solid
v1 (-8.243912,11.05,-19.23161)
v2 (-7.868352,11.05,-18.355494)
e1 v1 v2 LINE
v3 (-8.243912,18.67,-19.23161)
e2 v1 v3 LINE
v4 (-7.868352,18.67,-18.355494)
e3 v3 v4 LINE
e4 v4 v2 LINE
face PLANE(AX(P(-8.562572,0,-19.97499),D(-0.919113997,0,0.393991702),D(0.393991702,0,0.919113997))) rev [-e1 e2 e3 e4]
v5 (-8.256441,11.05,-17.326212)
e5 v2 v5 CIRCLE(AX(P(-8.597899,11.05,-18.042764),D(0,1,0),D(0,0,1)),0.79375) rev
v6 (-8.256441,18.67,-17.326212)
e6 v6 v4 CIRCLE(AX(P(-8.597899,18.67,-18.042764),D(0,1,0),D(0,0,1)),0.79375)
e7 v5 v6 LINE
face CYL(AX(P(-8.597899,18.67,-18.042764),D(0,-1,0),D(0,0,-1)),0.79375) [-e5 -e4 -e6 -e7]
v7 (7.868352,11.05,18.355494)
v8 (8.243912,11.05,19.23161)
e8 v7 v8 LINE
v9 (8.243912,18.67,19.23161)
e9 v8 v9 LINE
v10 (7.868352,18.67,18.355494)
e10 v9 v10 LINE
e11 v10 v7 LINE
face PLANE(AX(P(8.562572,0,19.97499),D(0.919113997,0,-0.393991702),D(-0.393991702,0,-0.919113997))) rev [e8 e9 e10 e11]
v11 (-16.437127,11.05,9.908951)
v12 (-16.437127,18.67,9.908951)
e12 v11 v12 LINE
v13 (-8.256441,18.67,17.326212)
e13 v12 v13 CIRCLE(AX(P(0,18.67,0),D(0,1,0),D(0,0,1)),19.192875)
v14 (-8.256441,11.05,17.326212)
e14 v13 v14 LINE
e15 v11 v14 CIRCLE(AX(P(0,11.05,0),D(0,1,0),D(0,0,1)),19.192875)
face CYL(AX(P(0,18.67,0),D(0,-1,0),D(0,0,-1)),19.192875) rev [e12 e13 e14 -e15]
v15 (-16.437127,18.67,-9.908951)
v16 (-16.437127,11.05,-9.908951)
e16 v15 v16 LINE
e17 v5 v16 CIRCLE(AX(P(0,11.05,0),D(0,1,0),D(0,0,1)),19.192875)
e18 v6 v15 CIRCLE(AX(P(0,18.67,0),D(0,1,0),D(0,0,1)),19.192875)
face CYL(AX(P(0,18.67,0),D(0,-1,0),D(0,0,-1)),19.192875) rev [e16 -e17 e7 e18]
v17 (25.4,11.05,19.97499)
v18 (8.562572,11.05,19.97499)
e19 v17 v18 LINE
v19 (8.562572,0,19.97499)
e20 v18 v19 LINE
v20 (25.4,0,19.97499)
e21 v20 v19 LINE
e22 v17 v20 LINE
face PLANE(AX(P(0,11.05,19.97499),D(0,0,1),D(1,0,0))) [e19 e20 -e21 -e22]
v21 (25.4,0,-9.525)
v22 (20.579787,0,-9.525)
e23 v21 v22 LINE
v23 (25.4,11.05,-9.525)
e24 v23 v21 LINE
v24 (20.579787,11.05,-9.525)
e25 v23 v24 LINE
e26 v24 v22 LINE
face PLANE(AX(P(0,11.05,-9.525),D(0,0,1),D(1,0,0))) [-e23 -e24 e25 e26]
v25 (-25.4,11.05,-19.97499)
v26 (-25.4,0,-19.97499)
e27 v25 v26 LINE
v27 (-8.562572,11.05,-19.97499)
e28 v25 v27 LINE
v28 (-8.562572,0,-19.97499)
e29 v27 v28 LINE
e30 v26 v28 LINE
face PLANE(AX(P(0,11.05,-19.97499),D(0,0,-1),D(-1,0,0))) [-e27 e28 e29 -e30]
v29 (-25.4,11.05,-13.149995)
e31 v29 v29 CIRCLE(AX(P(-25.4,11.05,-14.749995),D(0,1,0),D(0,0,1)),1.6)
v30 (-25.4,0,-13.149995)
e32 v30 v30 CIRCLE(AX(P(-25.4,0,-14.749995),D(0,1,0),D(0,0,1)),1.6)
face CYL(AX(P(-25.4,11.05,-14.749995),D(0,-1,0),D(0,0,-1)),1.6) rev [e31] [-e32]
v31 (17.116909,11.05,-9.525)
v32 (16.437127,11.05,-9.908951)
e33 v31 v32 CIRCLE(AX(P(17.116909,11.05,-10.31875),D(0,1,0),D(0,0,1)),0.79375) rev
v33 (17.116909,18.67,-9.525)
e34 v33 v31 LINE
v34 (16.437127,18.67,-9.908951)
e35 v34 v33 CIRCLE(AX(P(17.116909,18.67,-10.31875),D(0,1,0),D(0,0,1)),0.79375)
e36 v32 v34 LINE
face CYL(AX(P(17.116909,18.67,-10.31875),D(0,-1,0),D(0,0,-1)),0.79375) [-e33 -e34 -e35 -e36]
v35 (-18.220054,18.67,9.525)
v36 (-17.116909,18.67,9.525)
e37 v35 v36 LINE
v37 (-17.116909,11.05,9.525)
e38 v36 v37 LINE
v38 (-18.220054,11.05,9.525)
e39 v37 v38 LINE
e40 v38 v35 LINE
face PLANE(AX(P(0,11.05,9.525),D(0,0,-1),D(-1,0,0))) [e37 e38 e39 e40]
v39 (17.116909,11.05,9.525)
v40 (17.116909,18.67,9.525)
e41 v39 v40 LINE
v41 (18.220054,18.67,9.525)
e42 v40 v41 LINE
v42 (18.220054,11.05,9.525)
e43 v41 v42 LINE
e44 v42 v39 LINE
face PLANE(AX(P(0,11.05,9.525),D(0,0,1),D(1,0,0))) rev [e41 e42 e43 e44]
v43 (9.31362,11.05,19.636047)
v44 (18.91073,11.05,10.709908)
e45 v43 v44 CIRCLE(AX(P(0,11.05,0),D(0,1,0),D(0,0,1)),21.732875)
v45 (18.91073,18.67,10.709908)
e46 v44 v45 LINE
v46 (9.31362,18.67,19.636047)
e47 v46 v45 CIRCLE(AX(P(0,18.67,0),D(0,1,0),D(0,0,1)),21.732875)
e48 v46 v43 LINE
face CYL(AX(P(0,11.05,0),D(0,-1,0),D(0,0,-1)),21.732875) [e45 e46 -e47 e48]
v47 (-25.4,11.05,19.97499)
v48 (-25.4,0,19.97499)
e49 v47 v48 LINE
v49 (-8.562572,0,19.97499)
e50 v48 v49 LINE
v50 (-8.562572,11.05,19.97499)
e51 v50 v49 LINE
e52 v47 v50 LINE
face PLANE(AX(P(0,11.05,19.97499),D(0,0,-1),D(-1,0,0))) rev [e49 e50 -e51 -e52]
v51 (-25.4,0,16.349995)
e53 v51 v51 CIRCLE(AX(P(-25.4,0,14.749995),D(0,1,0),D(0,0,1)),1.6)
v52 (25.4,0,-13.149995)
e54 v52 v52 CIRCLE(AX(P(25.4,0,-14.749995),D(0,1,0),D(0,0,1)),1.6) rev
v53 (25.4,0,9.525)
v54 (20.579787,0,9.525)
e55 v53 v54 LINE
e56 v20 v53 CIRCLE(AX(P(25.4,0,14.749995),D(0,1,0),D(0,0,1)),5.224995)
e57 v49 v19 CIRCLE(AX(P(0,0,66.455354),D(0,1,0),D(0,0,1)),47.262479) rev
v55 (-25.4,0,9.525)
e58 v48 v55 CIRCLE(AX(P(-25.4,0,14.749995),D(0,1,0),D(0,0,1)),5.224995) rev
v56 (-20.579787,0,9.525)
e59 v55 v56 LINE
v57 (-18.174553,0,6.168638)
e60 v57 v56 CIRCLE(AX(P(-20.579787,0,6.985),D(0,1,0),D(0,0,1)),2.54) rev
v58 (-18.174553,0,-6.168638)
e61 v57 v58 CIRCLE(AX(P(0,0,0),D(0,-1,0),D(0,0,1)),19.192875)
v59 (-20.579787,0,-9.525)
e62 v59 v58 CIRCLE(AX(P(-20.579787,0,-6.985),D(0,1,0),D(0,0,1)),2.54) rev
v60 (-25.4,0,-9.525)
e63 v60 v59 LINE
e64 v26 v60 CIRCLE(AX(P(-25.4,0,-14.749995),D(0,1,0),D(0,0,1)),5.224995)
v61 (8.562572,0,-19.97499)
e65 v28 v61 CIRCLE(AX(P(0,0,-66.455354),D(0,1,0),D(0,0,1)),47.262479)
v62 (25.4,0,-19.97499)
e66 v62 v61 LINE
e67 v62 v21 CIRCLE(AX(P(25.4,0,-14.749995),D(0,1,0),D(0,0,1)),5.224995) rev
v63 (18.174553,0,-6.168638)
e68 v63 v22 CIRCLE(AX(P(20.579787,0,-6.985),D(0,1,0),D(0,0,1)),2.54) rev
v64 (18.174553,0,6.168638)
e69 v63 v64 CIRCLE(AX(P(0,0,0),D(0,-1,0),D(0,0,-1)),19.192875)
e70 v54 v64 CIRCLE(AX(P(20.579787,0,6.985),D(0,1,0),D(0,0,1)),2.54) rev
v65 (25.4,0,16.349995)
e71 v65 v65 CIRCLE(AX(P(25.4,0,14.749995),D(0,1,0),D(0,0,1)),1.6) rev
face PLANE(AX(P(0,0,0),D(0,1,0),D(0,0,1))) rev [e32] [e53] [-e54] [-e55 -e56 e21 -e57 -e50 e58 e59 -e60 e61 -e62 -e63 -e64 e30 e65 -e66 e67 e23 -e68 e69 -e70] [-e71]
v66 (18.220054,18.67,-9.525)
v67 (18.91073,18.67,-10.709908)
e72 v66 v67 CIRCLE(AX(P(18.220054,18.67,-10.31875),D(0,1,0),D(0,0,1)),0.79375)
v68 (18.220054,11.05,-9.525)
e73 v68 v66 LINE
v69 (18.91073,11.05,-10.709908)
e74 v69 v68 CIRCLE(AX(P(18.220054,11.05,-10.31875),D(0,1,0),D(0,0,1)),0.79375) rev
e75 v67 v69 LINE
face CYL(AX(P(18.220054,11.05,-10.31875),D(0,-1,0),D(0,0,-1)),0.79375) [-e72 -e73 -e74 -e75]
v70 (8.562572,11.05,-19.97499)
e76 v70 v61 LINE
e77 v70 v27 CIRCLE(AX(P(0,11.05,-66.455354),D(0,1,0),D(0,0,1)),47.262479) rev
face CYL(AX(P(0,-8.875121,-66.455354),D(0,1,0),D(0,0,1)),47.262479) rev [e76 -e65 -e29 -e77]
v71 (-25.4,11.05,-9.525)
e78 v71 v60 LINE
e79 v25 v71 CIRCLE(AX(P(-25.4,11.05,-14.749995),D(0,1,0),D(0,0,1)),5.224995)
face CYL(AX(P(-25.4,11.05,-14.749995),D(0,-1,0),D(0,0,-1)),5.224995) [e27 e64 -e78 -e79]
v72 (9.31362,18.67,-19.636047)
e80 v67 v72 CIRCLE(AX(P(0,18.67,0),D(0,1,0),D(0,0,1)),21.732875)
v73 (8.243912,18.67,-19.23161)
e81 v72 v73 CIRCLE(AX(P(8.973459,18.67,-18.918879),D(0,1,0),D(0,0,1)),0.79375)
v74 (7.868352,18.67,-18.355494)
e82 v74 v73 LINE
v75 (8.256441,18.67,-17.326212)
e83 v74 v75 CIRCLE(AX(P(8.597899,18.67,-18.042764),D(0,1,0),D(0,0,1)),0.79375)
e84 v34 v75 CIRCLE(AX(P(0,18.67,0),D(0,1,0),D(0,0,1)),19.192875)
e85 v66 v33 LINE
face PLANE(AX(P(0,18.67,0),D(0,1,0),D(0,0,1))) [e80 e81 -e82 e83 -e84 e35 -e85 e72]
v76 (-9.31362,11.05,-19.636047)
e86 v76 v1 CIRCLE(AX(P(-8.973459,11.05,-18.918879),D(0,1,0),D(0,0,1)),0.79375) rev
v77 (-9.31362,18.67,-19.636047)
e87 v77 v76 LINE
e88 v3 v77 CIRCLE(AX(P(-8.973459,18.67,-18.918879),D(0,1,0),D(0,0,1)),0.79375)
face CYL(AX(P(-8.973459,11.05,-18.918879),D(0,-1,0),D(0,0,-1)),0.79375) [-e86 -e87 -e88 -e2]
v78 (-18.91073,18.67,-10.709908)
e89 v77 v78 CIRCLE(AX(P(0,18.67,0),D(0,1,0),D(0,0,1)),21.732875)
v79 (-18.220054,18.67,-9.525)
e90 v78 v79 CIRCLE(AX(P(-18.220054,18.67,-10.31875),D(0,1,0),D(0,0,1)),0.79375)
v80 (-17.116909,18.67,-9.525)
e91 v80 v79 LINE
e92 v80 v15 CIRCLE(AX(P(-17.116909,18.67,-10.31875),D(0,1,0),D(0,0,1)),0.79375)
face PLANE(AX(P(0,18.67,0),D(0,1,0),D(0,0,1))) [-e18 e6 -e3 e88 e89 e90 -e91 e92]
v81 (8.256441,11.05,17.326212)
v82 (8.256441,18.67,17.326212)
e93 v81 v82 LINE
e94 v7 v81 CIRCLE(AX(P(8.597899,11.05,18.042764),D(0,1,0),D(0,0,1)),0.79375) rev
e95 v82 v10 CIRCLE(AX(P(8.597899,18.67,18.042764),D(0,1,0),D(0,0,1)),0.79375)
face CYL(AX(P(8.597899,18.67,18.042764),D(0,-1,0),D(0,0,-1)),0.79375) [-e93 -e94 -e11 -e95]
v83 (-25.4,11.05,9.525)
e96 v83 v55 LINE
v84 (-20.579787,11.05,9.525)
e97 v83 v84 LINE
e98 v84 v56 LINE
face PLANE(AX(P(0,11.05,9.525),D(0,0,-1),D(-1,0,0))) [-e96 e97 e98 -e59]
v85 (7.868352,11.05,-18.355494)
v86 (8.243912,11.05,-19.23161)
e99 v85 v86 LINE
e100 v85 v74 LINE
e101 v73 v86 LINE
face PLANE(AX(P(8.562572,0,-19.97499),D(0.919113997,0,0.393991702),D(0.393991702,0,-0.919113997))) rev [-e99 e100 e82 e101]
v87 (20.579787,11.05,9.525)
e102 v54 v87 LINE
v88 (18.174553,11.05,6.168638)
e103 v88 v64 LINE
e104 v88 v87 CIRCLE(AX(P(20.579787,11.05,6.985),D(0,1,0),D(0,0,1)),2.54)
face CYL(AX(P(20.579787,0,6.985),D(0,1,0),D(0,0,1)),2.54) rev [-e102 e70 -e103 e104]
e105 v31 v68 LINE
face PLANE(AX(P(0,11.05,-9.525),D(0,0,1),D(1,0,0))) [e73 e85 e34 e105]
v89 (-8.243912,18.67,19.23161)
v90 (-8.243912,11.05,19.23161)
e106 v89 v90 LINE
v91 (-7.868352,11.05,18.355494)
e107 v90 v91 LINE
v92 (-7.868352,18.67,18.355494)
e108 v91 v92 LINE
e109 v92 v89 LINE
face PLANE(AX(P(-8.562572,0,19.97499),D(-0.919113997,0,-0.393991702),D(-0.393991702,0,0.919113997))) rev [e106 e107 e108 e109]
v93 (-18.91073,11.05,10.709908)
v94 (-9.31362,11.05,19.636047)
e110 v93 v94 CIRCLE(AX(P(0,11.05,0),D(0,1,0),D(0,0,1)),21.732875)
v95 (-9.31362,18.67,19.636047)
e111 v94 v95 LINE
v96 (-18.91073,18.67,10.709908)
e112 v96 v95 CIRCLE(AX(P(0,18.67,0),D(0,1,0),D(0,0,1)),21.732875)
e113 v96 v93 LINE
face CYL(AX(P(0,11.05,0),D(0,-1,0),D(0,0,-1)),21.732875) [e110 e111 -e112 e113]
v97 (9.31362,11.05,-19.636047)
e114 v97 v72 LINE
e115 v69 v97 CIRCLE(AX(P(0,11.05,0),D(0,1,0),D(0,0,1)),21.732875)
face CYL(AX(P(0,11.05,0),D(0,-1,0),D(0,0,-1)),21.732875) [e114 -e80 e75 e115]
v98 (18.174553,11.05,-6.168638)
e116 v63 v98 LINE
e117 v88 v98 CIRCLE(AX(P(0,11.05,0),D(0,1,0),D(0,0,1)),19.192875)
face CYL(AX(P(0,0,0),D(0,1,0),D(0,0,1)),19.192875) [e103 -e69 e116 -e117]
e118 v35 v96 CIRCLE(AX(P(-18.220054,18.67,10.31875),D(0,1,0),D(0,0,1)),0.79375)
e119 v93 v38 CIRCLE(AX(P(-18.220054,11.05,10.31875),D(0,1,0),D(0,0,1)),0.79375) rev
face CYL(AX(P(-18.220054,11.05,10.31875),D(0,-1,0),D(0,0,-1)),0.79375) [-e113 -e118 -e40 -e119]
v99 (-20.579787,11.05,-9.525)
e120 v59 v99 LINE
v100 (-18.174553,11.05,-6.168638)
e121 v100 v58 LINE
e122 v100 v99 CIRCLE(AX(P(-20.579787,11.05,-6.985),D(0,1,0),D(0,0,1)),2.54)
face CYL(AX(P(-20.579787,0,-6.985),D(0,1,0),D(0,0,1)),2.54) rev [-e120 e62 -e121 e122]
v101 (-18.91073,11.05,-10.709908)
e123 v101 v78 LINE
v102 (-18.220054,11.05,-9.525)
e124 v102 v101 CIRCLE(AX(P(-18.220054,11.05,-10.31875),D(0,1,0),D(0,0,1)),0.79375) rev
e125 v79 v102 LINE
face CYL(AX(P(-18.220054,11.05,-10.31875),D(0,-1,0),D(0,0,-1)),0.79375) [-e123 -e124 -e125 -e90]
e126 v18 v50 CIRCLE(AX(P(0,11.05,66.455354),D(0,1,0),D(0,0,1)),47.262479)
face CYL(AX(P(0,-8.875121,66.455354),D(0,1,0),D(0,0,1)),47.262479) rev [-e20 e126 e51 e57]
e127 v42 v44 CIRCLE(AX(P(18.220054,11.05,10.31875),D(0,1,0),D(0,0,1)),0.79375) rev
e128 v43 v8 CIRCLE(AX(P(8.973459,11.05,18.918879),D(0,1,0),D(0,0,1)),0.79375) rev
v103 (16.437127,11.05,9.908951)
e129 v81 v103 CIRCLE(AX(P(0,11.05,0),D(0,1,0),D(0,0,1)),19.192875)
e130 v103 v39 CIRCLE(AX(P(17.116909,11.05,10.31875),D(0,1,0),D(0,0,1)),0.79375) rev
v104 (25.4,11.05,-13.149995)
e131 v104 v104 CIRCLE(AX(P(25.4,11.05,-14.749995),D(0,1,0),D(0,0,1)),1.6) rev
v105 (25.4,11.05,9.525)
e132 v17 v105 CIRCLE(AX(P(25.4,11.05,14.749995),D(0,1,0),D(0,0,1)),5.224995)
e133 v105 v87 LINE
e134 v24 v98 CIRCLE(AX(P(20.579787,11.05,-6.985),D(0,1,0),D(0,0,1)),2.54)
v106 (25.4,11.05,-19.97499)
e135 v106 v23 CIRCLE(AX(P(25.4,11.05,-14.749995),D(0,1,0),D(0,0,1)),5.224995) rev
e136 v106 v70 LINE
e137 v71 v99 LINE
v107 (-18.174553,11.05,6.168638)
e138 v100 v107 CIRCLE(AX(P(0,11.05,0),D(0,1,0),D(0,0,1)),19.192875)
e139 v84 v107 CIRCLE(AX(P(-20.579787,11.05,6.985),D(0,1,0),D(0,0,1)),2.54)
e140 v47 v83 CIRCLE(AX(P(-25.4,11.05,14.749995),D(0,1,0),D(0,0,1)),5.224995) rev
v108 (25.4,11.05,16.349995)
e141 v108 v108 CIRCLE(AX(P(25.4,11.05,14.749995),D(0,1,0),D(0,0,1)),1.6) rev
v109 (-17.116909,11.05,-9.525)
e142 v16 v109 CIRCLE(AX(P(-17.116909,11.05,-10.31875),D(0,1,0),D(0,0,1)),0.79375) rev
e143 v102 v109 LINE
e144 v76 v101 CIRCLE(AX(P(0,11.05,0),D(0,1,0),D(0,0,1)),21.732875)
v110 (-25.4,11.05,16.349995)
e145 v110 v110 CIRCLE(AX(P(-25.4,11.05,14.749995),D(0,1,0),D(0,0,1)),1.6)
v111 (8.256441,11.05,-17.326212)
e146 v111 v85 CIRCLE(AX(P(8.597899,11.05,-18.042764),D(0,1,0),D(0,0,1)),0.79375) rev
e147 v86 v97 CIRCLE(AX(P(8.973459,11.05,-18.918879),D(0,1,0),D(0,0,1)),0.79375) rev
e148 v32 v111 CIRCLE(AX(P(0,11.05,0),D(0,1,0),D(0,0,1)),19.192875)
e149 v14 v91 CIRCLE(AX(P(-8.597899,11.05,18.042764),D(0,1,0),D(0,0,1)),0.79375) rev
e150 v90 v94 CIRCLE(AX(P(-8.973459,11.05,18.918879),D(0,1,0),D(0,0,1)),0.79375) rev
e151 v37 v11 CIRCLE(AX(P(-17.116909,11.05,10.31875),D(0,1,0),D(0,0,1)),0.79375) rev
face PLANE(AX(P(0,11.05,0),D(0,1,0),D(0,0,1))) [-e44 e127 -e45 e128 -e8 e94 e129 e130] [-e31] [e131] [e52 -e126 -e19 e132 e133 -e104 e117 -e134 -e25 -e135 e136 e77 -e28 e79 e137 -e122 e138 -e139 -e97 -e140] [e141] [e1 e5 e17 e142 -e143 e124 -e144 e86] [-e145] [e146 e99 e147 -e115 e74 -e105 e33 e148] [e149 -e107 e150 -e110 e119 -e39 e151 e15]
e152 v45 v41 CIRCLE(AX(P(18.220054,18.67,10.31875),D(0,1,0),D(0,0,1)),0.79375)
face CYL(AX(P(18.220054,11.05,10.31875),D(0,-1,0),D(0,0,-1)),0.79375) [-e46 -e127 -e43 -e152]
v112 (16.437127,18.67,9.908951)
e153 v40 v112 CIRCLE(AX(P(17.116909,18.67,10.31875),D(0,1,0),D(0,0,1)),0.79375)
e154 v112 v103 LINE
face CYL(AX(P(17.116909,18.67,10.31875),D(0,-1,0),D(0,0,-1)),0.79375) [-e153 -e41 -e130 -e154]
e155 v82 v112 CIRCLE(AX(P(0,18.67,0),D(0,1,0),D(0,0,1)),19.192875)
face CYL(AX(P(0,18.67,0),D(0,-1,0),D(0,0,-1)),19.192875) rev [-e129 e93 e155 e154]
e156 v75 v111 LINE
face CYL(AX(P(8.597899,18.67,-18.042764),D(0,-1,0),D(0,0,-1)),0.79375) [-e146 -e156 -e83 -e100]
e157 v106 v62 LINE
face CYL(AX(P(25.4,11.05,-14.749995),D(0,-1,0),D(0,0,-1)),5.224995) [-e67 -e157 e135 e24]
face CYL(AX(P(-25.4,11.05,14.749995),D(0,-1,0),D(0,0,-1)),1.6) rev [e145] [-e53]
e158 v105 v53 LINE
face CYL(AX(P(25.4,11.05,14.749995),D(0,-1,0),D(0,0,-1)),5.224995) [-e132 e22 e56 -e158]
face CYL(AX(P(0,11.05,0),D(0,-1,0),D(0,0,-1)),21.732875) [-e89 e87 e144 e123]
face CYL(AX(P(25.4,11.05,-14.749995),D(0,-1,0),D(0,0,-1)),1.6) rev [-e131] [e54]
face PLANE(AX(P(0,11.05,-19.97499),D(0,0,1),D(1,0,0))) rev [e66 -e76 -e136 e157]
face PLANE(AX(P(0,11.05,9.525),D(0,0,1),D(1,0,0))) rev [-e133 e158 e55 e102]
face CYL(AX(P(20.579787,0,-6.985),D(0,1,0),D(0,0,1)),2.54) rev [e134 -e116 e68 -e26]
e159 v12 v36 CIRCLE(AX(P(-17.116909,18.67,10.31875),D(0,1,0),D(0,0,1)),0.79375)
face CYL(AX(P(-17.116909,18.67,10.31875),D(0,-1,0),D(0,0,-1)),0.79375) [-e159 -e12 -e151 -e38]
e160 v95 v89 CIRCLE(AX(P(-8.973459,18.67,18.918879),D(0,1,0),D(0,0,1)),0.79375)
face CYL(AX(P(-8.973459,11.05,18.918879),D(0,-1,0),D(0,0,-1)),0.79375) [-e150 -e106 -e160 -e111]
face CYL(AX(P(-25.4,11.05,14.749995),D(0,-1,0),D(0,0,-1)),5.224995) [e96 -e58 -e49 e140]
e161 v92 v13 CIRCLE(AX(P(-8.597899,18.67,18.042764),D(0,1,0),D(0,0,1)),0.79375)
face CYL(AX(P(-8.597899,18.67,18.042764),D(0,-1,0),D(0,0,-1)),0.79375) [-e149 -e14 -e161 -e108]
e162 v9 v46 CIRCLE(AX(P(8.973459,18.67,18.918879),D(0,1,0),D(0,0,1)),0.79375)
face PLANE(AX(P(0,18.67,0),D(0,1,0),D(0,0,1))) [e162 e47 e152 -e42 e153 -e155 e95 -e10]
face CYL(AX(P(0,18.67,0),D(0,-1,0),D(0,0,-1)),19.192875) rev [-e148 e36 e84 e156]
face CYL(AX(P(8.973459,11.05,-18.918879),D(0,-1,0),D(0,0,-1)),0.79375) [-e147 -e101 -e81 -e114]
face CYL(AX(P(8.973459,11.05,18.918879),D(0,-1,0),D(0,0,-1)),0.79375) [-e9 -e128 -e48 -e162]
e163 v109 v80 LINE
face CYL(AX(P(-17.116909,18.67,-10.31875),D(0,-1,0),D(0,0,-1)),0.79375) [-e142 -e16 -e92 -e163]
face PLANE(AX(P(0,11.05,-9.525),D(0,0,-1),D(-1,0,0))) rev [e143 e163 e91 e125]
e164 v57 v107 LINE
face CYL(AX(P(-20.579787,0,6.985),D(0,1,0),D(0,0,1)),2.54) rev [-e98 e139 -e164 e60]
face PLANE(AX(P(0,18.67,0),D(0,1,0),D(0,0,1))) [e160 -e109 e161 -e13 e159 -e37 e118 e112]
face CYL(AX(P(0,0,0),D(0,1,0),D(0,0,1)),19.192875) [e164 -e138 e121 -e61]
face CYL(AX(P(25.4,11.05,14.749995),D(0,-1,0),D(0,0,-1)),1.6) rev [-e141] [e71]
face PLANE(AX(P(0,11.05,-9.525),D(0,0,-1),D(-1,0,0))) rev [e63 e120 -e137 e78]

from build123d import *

# Parameters (mm, degrees)
SKETCH1_R           = 1.6
SKETCH1_R_2         = 21.732875
SKETCH1_R_3         = 19.192875
BOSS_EXTRUDE1_DEPTH = 11.05
BOSS_EXTRUDE2_START = 11.05
SKETCH1_3_R         = 21.732875
SKETCH1_3_R_2       = 19.192875
BOSS_EXTRUDE2_DEPTH = 7.62
CUT_EXTRUDE1_DEPTH  = 42.937776077
FILLET2_R           = 0.79375
FILLET4_R           = 2.54
FILLET5_R           = 2.54
FILLET6_R           = 2.54
FILLET7_R           = 2.54
BOSS_EXTRUDE3_DEPTH = 11.05


with BuildPart() as part:
    # Sketch1 → Boss-Extrude1 (new body)
    # profile 1 of 6: a face of its own
    with BuildSketch(Plane(origin=(0, 0, 0), x_dir=(1, 0, 0), z_dir=(0, 1, 0))):
        with BuildLine():
            Line((-8.562572408, 19.9749896), (-25.4, 19.9749896))
            ThreePointArc((-25.4, 19.9749896), (-30.6249948, 14.7499948), (-25.4, 9.525))
            Line((-25.4, 9.525), (-19.534385856, 9.525))
            ThreePointArc((-19.534385856, 9.525), (-14.98867361, 15.737138215), (-8.562572408, 19.9749896))
        make_face()
        with Locations(Location((-25.4, 14.7499948, 0), (0, 0, 270))):
            Circle(SKETCH1_R, mode=Mode.SUBTRACT)
    # profile 2 of 6: a face of its own
    with BuildSketch(Plane(origin=(0, 0, 0), x_dir=(1, 0, 0), z_dir=(0, 1, 0))):
        Circle(SKETCH1_R_2)
        Circle(SKETCH1_R_3, mode=Mode.SUBTRACT)
    # profile 3 of 6: a face of its own
    with BuildSketch(Plane(origin=(0, 0, 0), x_dir=(1, 0, 0), z_dir=(0, 1, 0))):
        with BuildLine():
            Line((25.4, 19.9749896), (8.562572408, 19.9749896))
            ThreePointArc((8.562572408, 19.9749896), (14.98867361, 15.737138215), (19.534385856, 9.525))
            Line((19.534385856, 9.525), (25.4, 9.525))
            ThreePointArc((25.4, 9.525), (30.6249948, 14.7499948), (25.4, 19.9749896))
        make_face()
        with Locations(Location((25.4, 14.7499948, 0), (0, 0, 270))):
            Circle(SKETCH1_R, mode=Mode.SUBTRACT)
    # profile 4 of 6: a face of its own
    with BuildSketch(Plane(origin=(0, 0, 0), x_dir=(1, 0, 0), z_dir=(0, 1, 0))):
        with BuildLine():
            Line((25.4, -9.525), (19.534385856, -9.525))
            ThreePointArc((19.534385856, -9.525), (14.98867361, -15.737138215), (8.562572408, -19.9749896))
            Line((8.562572408, -19.9749896), (25.4, -19.9749896))
            ThreePointArc((25.4, -19.9749896), (30.6249948, -14.7499948), (25.4, -9.525))
        make_face()
        with Locations(Location((25.4, -14.7499948, 0), (0, 0, 270))):
            Circle(SKETCH1_R, mode=Mode.SUBTRACT)
    # profile 5 of 6: a face of its own
    with BuildSketch(Plane(origin=(0, 0, 0), x_dir=(1, 0, 0), z_dir=(0, 1, 0))):
        with BuildLine():
            ThreePointArc((-8.562572408, -19.9749896), (-14.98867361, -15.737138215), (-19.534385856, -9.525))
            Line((-19.534385856, -9.525), (-25.4, -9.525))
            ThreePointArc((-25.4, -9.525), (-30.6249948, -14.7499948), (-25.4, -19.9749896))
            Line((-25.4, -19.9749896), (-8.562572408, -19.9749896))
        make_face()
        with Locations(Location((-25.4, -14.7499948, 0), (0, 0, 270))):
            Circle(SKETCH1_R, mode=Mode.SUBTRACT)
    # profile 6 of 6: a face of its own
    with BuildSketch(Plane(origin=(0, 0, 0), x_dir=(1, 0, 0), z_dir=(0, 1, 0))):
        Circle(SKETCH1_R_3)
    extrude(amount=BOSS_EXTRUDE1_DEPTH)

    # Sketch1<3> → Boss-Extrude2 (add)
    with BuildSketch(Plane(origin=(0, 0, 0), x_dir=(1, 0, 0), z_dir=(0, 1, 0)).offset(BOSS_EXTRUDE2_START)):
        with Locations(Location((0, 0, 0), (0, 0, 113.203103919))):
            Circle(SKETCH1_3_R)
        with Locations(Location((0, 0, 0), (0, 0, 90))):
            Circle(SKETCH1_3_R_2, mode=Mode.SUBTRACT)
    extrude(amount=BOSS_EXTRUDE2_DEPTH)

    # Sketch2 → Cut-Extrude1 (cut, through all)
    with BuildSketch(Plane(origin=(0, 18.67, 0), x_dir=(1, 0, 0), z_dir=(0, 1, 0))):
        with BuildLine():
            Line((-19.534385856, 9.525), (-16.6625576, 9.525))
            ThreePointArc((-16.6625576, 9.525), (-19.192875, 0), (-16.6625576, -9.525))
            Line((-16.6625576, -9.525), (-19.534385856, -9.525))
            ThreePointArc((-19.534385856, -9.525), (-21.732875, 0), (-19.534385856, 9.525))
        make_face()
        with BuildLine():
            Line((19.534385856, 9.525), (16.6625576, 9.525))
            ThreePointArc((16.6625576, 9.525), (19.192875, 0), (16.6625576, -9.525))
            Line((16.6625576, -9.525), (19.534385856, -9.525))
            ThreePointArc((19.534385856, -9.525), (21.732875, 0), (19.534385856, 9.525))
        make_face()
        with BuildLine():
            Line((-8.562572408, 19.9749896), (-7.561833485, 17.640440049))
            ThreePointArc((-7.561833485, 17.640440049), (0, 19.192875), (7.561833485, 17.640440049))
            Line((7.561833485, 17.640440049), (8.562572408, 19.9749896))
            ThreePointArc((8.562572408, 19.9749896), (0, 21.732875), (-8.562572408, 19.9749896))
        make_face()
        with BuildLine():
            Line((-8.562572408, -19.9749896), (-7.561833485, -17.640440049))
            ThreePointArc((-7.561833485, -17.640440049), (0, -19.192875), (7.561833485, -17.640440049))
            Line((7.561833485, -17.640440049), (8.562572408, -19.9749896))
            ThreePointArc((8.562572408, -19.9749896), (0, -21.732875), (-8.562572408, -19.9749896))
        make_face()
    extrude(amount=-CUT_EXTRUDE1_DEPTH, mode=Mode.SUBTRACT)

    # Fillet2
    fillet2_edges = [part.edges().sort_by_distance(p)[0] for p in [
        (16.6625576, 14.86, 9.525),
        (19.534385856, 14.86, -9.525),
        (19.534385856, 14.86, 9.525),
        (16.6625576, 14.86, -9.525),
        (7.561833485, 14.86, -17.640440049),
        (-8.562572408, 14.86, -19.9749896),
        (8.562572408, 14.86, -19.9749896),
        (-7.561833485, 14.86, -17.640440049),
        (-16.6625576, 14.86, -9.525),
        (-19.534385856, 14.86, 9.525),
        (-19.534385856, 14.86, -9.525),
        (-16.6625576, 14.86, 9.525),
        (-7.561833485, 14.86, 17.640440049),
        (8.562572408, 14.86, 19.9749896),
        (-8.562572408, 14.86, 19.9749896),
        (7.561833485, 14.86, 17.640440049),
    ]]
    fillet(fillet2_edges, radius=FILLET2_R)

    # Fillet4
    # the kernel refuses this fillet: 2.54 mm, written as the material it adds along each edge
    with BuildSketch(Plane(origin=(16.6625576, 11.05, 9.525), x_dir=(1, 0, 0), z_dir=(0, -1, 0))) as fillet4_piece_1:
        with BuildLine():
            CenterArc((3.917229347, -2.54), FILLET4_R, 90, 108.747762366)
            ThreePointArc((1.511994934, -3.356362308), (0.836652457, -1.641847194), (0, 0))
            Line((0, 0), (3.917229347, 0))
        make_face()
    extrude(amount=11.05)

    # Fillet5
    # the kernel refuses this fillet: 2.54 mm, written as the material it adds along each edge
    with BuildSketch(Plane(origin=(16.6625576, 11.05, -9.525), x_dir=(0.41073329589504654, 0, 0.9117555372155368), z_dir=(0, -1, 0))) as fillet5_piece_1:
        with BuildLine():
            CenterArc((3.924795585, -2.528292976), FILLET5_R, 95.503145264, 108.747762366)
            Line((1.60893652, -3.571555547), (0, 0))
            ThreePointArc((0, 0), (1.840604291, -0.088461201), (3.681208582, 0))
        make_face()
    extrude(amount=11.05)

    # Fillet6
    # the kernel refuses this fillet: 2.54 mm, written as the material it adds along each edge
    with BuildSketch(Plane(origin=(-16.6625576, 11.05, -9.525), x_dir=(-1, 0, 0), z_dir=(0, -1, 0))) as fillet6_piece_1:
        with BuildLine():
            CenterArc((3.917229347, -2.54), FILLET6_R, 90, 108.747762366)
            ThreePointArc((1.511994934, -3.356362308), (0.836652457, -1.641847194), (0, 0))
            Line((0, 0), (3.917229347, 0))
        make_face()
    extrude(amount=11.05)

    # Fillet7
    # the kernel refuses this fillet: 2.54 mm, written as the material it adds along each edge
    with BuildSketch(Plane(origin=(-16.6625576, 11.05, 9.525), x_dir=(-0.41073329589504604, 0, -0.9117555372155371), z_dir=(0, -1, 0))) as fillet7_piece_1:
        with BuildLine():
            CenterArc((3.924795585, -2.528292976), FILLET7_R, 95.503145264, 108.747762366)
            Line((1.60893652, -3.571555547), (0, 0))
            ThreePointArc((0, 0), (1.840604291, -0.088461201), (3.681208582, 0))
        make_face()
    extrude(amount=11.05)

    # Sketch3 → Boss-Extrude3 (add)
    with BuildSketch(Plane(origin=(0, 11.05, 0), x_dir=(1, 0, 0), z_dir=(0, 1, 0))):
        with BuildLine():
            ThreePointArc((9.7e-08, 19.192875), (3.859772707, 18.800760767), (7.561833485, 17.640440049))
            Line((7.561833485, 17.640440049), (8.562572408, 19.9749896))
            ThreePointArc((8.562572408, 19.9749896), (4.299108953, 19.388809795), (9.7e-08, 19.192875))
        make_face()
        with BuildLine():
            ThreePointArc((-7.561833485, 17.640440049), (-3.859772612, 18.800760786), (9.7e-08, 19.192875))
            ThreePointArc((9.7e-08, 19.192875), (-4.299108856, 19.388809786), (-8.562572408, 19.9749896))
            Line((-8.562572408, 19.9749896), (-7.561833485, 17.640440049))
        make_face()
        with BuildLine():
            ThreePointArc((7.561833485, -17.640440049), (3.859772707, -18.800760767), (9.7e-08, -19.192875))
            ThreePointArc((9.7e-08, -19.192875), (4.299108953, -19.388809795), (8.562572408, -19.9749896))
            Line((8.562572408, -19.9749896), (7.561833485, -17.640440049))
        make_face()
        with BuildLine():
            Line((-7.561833485, -17.640440049), (-8.562572408, -19.9749896))
            ThreePointArc((-8.562572408, -19.9749896), (-4.299108856, -19.388809786), (9.7e-08, -19.192875))
            ThreePointArc((9.7e-08, -19.192875), (-3.859772612, -18.800760786), (-7.561833485, -17.640440049))
        make_face()
    extrude(amount=-BOSS_EXTRUDE3_DEPTH)


solid = part.part
